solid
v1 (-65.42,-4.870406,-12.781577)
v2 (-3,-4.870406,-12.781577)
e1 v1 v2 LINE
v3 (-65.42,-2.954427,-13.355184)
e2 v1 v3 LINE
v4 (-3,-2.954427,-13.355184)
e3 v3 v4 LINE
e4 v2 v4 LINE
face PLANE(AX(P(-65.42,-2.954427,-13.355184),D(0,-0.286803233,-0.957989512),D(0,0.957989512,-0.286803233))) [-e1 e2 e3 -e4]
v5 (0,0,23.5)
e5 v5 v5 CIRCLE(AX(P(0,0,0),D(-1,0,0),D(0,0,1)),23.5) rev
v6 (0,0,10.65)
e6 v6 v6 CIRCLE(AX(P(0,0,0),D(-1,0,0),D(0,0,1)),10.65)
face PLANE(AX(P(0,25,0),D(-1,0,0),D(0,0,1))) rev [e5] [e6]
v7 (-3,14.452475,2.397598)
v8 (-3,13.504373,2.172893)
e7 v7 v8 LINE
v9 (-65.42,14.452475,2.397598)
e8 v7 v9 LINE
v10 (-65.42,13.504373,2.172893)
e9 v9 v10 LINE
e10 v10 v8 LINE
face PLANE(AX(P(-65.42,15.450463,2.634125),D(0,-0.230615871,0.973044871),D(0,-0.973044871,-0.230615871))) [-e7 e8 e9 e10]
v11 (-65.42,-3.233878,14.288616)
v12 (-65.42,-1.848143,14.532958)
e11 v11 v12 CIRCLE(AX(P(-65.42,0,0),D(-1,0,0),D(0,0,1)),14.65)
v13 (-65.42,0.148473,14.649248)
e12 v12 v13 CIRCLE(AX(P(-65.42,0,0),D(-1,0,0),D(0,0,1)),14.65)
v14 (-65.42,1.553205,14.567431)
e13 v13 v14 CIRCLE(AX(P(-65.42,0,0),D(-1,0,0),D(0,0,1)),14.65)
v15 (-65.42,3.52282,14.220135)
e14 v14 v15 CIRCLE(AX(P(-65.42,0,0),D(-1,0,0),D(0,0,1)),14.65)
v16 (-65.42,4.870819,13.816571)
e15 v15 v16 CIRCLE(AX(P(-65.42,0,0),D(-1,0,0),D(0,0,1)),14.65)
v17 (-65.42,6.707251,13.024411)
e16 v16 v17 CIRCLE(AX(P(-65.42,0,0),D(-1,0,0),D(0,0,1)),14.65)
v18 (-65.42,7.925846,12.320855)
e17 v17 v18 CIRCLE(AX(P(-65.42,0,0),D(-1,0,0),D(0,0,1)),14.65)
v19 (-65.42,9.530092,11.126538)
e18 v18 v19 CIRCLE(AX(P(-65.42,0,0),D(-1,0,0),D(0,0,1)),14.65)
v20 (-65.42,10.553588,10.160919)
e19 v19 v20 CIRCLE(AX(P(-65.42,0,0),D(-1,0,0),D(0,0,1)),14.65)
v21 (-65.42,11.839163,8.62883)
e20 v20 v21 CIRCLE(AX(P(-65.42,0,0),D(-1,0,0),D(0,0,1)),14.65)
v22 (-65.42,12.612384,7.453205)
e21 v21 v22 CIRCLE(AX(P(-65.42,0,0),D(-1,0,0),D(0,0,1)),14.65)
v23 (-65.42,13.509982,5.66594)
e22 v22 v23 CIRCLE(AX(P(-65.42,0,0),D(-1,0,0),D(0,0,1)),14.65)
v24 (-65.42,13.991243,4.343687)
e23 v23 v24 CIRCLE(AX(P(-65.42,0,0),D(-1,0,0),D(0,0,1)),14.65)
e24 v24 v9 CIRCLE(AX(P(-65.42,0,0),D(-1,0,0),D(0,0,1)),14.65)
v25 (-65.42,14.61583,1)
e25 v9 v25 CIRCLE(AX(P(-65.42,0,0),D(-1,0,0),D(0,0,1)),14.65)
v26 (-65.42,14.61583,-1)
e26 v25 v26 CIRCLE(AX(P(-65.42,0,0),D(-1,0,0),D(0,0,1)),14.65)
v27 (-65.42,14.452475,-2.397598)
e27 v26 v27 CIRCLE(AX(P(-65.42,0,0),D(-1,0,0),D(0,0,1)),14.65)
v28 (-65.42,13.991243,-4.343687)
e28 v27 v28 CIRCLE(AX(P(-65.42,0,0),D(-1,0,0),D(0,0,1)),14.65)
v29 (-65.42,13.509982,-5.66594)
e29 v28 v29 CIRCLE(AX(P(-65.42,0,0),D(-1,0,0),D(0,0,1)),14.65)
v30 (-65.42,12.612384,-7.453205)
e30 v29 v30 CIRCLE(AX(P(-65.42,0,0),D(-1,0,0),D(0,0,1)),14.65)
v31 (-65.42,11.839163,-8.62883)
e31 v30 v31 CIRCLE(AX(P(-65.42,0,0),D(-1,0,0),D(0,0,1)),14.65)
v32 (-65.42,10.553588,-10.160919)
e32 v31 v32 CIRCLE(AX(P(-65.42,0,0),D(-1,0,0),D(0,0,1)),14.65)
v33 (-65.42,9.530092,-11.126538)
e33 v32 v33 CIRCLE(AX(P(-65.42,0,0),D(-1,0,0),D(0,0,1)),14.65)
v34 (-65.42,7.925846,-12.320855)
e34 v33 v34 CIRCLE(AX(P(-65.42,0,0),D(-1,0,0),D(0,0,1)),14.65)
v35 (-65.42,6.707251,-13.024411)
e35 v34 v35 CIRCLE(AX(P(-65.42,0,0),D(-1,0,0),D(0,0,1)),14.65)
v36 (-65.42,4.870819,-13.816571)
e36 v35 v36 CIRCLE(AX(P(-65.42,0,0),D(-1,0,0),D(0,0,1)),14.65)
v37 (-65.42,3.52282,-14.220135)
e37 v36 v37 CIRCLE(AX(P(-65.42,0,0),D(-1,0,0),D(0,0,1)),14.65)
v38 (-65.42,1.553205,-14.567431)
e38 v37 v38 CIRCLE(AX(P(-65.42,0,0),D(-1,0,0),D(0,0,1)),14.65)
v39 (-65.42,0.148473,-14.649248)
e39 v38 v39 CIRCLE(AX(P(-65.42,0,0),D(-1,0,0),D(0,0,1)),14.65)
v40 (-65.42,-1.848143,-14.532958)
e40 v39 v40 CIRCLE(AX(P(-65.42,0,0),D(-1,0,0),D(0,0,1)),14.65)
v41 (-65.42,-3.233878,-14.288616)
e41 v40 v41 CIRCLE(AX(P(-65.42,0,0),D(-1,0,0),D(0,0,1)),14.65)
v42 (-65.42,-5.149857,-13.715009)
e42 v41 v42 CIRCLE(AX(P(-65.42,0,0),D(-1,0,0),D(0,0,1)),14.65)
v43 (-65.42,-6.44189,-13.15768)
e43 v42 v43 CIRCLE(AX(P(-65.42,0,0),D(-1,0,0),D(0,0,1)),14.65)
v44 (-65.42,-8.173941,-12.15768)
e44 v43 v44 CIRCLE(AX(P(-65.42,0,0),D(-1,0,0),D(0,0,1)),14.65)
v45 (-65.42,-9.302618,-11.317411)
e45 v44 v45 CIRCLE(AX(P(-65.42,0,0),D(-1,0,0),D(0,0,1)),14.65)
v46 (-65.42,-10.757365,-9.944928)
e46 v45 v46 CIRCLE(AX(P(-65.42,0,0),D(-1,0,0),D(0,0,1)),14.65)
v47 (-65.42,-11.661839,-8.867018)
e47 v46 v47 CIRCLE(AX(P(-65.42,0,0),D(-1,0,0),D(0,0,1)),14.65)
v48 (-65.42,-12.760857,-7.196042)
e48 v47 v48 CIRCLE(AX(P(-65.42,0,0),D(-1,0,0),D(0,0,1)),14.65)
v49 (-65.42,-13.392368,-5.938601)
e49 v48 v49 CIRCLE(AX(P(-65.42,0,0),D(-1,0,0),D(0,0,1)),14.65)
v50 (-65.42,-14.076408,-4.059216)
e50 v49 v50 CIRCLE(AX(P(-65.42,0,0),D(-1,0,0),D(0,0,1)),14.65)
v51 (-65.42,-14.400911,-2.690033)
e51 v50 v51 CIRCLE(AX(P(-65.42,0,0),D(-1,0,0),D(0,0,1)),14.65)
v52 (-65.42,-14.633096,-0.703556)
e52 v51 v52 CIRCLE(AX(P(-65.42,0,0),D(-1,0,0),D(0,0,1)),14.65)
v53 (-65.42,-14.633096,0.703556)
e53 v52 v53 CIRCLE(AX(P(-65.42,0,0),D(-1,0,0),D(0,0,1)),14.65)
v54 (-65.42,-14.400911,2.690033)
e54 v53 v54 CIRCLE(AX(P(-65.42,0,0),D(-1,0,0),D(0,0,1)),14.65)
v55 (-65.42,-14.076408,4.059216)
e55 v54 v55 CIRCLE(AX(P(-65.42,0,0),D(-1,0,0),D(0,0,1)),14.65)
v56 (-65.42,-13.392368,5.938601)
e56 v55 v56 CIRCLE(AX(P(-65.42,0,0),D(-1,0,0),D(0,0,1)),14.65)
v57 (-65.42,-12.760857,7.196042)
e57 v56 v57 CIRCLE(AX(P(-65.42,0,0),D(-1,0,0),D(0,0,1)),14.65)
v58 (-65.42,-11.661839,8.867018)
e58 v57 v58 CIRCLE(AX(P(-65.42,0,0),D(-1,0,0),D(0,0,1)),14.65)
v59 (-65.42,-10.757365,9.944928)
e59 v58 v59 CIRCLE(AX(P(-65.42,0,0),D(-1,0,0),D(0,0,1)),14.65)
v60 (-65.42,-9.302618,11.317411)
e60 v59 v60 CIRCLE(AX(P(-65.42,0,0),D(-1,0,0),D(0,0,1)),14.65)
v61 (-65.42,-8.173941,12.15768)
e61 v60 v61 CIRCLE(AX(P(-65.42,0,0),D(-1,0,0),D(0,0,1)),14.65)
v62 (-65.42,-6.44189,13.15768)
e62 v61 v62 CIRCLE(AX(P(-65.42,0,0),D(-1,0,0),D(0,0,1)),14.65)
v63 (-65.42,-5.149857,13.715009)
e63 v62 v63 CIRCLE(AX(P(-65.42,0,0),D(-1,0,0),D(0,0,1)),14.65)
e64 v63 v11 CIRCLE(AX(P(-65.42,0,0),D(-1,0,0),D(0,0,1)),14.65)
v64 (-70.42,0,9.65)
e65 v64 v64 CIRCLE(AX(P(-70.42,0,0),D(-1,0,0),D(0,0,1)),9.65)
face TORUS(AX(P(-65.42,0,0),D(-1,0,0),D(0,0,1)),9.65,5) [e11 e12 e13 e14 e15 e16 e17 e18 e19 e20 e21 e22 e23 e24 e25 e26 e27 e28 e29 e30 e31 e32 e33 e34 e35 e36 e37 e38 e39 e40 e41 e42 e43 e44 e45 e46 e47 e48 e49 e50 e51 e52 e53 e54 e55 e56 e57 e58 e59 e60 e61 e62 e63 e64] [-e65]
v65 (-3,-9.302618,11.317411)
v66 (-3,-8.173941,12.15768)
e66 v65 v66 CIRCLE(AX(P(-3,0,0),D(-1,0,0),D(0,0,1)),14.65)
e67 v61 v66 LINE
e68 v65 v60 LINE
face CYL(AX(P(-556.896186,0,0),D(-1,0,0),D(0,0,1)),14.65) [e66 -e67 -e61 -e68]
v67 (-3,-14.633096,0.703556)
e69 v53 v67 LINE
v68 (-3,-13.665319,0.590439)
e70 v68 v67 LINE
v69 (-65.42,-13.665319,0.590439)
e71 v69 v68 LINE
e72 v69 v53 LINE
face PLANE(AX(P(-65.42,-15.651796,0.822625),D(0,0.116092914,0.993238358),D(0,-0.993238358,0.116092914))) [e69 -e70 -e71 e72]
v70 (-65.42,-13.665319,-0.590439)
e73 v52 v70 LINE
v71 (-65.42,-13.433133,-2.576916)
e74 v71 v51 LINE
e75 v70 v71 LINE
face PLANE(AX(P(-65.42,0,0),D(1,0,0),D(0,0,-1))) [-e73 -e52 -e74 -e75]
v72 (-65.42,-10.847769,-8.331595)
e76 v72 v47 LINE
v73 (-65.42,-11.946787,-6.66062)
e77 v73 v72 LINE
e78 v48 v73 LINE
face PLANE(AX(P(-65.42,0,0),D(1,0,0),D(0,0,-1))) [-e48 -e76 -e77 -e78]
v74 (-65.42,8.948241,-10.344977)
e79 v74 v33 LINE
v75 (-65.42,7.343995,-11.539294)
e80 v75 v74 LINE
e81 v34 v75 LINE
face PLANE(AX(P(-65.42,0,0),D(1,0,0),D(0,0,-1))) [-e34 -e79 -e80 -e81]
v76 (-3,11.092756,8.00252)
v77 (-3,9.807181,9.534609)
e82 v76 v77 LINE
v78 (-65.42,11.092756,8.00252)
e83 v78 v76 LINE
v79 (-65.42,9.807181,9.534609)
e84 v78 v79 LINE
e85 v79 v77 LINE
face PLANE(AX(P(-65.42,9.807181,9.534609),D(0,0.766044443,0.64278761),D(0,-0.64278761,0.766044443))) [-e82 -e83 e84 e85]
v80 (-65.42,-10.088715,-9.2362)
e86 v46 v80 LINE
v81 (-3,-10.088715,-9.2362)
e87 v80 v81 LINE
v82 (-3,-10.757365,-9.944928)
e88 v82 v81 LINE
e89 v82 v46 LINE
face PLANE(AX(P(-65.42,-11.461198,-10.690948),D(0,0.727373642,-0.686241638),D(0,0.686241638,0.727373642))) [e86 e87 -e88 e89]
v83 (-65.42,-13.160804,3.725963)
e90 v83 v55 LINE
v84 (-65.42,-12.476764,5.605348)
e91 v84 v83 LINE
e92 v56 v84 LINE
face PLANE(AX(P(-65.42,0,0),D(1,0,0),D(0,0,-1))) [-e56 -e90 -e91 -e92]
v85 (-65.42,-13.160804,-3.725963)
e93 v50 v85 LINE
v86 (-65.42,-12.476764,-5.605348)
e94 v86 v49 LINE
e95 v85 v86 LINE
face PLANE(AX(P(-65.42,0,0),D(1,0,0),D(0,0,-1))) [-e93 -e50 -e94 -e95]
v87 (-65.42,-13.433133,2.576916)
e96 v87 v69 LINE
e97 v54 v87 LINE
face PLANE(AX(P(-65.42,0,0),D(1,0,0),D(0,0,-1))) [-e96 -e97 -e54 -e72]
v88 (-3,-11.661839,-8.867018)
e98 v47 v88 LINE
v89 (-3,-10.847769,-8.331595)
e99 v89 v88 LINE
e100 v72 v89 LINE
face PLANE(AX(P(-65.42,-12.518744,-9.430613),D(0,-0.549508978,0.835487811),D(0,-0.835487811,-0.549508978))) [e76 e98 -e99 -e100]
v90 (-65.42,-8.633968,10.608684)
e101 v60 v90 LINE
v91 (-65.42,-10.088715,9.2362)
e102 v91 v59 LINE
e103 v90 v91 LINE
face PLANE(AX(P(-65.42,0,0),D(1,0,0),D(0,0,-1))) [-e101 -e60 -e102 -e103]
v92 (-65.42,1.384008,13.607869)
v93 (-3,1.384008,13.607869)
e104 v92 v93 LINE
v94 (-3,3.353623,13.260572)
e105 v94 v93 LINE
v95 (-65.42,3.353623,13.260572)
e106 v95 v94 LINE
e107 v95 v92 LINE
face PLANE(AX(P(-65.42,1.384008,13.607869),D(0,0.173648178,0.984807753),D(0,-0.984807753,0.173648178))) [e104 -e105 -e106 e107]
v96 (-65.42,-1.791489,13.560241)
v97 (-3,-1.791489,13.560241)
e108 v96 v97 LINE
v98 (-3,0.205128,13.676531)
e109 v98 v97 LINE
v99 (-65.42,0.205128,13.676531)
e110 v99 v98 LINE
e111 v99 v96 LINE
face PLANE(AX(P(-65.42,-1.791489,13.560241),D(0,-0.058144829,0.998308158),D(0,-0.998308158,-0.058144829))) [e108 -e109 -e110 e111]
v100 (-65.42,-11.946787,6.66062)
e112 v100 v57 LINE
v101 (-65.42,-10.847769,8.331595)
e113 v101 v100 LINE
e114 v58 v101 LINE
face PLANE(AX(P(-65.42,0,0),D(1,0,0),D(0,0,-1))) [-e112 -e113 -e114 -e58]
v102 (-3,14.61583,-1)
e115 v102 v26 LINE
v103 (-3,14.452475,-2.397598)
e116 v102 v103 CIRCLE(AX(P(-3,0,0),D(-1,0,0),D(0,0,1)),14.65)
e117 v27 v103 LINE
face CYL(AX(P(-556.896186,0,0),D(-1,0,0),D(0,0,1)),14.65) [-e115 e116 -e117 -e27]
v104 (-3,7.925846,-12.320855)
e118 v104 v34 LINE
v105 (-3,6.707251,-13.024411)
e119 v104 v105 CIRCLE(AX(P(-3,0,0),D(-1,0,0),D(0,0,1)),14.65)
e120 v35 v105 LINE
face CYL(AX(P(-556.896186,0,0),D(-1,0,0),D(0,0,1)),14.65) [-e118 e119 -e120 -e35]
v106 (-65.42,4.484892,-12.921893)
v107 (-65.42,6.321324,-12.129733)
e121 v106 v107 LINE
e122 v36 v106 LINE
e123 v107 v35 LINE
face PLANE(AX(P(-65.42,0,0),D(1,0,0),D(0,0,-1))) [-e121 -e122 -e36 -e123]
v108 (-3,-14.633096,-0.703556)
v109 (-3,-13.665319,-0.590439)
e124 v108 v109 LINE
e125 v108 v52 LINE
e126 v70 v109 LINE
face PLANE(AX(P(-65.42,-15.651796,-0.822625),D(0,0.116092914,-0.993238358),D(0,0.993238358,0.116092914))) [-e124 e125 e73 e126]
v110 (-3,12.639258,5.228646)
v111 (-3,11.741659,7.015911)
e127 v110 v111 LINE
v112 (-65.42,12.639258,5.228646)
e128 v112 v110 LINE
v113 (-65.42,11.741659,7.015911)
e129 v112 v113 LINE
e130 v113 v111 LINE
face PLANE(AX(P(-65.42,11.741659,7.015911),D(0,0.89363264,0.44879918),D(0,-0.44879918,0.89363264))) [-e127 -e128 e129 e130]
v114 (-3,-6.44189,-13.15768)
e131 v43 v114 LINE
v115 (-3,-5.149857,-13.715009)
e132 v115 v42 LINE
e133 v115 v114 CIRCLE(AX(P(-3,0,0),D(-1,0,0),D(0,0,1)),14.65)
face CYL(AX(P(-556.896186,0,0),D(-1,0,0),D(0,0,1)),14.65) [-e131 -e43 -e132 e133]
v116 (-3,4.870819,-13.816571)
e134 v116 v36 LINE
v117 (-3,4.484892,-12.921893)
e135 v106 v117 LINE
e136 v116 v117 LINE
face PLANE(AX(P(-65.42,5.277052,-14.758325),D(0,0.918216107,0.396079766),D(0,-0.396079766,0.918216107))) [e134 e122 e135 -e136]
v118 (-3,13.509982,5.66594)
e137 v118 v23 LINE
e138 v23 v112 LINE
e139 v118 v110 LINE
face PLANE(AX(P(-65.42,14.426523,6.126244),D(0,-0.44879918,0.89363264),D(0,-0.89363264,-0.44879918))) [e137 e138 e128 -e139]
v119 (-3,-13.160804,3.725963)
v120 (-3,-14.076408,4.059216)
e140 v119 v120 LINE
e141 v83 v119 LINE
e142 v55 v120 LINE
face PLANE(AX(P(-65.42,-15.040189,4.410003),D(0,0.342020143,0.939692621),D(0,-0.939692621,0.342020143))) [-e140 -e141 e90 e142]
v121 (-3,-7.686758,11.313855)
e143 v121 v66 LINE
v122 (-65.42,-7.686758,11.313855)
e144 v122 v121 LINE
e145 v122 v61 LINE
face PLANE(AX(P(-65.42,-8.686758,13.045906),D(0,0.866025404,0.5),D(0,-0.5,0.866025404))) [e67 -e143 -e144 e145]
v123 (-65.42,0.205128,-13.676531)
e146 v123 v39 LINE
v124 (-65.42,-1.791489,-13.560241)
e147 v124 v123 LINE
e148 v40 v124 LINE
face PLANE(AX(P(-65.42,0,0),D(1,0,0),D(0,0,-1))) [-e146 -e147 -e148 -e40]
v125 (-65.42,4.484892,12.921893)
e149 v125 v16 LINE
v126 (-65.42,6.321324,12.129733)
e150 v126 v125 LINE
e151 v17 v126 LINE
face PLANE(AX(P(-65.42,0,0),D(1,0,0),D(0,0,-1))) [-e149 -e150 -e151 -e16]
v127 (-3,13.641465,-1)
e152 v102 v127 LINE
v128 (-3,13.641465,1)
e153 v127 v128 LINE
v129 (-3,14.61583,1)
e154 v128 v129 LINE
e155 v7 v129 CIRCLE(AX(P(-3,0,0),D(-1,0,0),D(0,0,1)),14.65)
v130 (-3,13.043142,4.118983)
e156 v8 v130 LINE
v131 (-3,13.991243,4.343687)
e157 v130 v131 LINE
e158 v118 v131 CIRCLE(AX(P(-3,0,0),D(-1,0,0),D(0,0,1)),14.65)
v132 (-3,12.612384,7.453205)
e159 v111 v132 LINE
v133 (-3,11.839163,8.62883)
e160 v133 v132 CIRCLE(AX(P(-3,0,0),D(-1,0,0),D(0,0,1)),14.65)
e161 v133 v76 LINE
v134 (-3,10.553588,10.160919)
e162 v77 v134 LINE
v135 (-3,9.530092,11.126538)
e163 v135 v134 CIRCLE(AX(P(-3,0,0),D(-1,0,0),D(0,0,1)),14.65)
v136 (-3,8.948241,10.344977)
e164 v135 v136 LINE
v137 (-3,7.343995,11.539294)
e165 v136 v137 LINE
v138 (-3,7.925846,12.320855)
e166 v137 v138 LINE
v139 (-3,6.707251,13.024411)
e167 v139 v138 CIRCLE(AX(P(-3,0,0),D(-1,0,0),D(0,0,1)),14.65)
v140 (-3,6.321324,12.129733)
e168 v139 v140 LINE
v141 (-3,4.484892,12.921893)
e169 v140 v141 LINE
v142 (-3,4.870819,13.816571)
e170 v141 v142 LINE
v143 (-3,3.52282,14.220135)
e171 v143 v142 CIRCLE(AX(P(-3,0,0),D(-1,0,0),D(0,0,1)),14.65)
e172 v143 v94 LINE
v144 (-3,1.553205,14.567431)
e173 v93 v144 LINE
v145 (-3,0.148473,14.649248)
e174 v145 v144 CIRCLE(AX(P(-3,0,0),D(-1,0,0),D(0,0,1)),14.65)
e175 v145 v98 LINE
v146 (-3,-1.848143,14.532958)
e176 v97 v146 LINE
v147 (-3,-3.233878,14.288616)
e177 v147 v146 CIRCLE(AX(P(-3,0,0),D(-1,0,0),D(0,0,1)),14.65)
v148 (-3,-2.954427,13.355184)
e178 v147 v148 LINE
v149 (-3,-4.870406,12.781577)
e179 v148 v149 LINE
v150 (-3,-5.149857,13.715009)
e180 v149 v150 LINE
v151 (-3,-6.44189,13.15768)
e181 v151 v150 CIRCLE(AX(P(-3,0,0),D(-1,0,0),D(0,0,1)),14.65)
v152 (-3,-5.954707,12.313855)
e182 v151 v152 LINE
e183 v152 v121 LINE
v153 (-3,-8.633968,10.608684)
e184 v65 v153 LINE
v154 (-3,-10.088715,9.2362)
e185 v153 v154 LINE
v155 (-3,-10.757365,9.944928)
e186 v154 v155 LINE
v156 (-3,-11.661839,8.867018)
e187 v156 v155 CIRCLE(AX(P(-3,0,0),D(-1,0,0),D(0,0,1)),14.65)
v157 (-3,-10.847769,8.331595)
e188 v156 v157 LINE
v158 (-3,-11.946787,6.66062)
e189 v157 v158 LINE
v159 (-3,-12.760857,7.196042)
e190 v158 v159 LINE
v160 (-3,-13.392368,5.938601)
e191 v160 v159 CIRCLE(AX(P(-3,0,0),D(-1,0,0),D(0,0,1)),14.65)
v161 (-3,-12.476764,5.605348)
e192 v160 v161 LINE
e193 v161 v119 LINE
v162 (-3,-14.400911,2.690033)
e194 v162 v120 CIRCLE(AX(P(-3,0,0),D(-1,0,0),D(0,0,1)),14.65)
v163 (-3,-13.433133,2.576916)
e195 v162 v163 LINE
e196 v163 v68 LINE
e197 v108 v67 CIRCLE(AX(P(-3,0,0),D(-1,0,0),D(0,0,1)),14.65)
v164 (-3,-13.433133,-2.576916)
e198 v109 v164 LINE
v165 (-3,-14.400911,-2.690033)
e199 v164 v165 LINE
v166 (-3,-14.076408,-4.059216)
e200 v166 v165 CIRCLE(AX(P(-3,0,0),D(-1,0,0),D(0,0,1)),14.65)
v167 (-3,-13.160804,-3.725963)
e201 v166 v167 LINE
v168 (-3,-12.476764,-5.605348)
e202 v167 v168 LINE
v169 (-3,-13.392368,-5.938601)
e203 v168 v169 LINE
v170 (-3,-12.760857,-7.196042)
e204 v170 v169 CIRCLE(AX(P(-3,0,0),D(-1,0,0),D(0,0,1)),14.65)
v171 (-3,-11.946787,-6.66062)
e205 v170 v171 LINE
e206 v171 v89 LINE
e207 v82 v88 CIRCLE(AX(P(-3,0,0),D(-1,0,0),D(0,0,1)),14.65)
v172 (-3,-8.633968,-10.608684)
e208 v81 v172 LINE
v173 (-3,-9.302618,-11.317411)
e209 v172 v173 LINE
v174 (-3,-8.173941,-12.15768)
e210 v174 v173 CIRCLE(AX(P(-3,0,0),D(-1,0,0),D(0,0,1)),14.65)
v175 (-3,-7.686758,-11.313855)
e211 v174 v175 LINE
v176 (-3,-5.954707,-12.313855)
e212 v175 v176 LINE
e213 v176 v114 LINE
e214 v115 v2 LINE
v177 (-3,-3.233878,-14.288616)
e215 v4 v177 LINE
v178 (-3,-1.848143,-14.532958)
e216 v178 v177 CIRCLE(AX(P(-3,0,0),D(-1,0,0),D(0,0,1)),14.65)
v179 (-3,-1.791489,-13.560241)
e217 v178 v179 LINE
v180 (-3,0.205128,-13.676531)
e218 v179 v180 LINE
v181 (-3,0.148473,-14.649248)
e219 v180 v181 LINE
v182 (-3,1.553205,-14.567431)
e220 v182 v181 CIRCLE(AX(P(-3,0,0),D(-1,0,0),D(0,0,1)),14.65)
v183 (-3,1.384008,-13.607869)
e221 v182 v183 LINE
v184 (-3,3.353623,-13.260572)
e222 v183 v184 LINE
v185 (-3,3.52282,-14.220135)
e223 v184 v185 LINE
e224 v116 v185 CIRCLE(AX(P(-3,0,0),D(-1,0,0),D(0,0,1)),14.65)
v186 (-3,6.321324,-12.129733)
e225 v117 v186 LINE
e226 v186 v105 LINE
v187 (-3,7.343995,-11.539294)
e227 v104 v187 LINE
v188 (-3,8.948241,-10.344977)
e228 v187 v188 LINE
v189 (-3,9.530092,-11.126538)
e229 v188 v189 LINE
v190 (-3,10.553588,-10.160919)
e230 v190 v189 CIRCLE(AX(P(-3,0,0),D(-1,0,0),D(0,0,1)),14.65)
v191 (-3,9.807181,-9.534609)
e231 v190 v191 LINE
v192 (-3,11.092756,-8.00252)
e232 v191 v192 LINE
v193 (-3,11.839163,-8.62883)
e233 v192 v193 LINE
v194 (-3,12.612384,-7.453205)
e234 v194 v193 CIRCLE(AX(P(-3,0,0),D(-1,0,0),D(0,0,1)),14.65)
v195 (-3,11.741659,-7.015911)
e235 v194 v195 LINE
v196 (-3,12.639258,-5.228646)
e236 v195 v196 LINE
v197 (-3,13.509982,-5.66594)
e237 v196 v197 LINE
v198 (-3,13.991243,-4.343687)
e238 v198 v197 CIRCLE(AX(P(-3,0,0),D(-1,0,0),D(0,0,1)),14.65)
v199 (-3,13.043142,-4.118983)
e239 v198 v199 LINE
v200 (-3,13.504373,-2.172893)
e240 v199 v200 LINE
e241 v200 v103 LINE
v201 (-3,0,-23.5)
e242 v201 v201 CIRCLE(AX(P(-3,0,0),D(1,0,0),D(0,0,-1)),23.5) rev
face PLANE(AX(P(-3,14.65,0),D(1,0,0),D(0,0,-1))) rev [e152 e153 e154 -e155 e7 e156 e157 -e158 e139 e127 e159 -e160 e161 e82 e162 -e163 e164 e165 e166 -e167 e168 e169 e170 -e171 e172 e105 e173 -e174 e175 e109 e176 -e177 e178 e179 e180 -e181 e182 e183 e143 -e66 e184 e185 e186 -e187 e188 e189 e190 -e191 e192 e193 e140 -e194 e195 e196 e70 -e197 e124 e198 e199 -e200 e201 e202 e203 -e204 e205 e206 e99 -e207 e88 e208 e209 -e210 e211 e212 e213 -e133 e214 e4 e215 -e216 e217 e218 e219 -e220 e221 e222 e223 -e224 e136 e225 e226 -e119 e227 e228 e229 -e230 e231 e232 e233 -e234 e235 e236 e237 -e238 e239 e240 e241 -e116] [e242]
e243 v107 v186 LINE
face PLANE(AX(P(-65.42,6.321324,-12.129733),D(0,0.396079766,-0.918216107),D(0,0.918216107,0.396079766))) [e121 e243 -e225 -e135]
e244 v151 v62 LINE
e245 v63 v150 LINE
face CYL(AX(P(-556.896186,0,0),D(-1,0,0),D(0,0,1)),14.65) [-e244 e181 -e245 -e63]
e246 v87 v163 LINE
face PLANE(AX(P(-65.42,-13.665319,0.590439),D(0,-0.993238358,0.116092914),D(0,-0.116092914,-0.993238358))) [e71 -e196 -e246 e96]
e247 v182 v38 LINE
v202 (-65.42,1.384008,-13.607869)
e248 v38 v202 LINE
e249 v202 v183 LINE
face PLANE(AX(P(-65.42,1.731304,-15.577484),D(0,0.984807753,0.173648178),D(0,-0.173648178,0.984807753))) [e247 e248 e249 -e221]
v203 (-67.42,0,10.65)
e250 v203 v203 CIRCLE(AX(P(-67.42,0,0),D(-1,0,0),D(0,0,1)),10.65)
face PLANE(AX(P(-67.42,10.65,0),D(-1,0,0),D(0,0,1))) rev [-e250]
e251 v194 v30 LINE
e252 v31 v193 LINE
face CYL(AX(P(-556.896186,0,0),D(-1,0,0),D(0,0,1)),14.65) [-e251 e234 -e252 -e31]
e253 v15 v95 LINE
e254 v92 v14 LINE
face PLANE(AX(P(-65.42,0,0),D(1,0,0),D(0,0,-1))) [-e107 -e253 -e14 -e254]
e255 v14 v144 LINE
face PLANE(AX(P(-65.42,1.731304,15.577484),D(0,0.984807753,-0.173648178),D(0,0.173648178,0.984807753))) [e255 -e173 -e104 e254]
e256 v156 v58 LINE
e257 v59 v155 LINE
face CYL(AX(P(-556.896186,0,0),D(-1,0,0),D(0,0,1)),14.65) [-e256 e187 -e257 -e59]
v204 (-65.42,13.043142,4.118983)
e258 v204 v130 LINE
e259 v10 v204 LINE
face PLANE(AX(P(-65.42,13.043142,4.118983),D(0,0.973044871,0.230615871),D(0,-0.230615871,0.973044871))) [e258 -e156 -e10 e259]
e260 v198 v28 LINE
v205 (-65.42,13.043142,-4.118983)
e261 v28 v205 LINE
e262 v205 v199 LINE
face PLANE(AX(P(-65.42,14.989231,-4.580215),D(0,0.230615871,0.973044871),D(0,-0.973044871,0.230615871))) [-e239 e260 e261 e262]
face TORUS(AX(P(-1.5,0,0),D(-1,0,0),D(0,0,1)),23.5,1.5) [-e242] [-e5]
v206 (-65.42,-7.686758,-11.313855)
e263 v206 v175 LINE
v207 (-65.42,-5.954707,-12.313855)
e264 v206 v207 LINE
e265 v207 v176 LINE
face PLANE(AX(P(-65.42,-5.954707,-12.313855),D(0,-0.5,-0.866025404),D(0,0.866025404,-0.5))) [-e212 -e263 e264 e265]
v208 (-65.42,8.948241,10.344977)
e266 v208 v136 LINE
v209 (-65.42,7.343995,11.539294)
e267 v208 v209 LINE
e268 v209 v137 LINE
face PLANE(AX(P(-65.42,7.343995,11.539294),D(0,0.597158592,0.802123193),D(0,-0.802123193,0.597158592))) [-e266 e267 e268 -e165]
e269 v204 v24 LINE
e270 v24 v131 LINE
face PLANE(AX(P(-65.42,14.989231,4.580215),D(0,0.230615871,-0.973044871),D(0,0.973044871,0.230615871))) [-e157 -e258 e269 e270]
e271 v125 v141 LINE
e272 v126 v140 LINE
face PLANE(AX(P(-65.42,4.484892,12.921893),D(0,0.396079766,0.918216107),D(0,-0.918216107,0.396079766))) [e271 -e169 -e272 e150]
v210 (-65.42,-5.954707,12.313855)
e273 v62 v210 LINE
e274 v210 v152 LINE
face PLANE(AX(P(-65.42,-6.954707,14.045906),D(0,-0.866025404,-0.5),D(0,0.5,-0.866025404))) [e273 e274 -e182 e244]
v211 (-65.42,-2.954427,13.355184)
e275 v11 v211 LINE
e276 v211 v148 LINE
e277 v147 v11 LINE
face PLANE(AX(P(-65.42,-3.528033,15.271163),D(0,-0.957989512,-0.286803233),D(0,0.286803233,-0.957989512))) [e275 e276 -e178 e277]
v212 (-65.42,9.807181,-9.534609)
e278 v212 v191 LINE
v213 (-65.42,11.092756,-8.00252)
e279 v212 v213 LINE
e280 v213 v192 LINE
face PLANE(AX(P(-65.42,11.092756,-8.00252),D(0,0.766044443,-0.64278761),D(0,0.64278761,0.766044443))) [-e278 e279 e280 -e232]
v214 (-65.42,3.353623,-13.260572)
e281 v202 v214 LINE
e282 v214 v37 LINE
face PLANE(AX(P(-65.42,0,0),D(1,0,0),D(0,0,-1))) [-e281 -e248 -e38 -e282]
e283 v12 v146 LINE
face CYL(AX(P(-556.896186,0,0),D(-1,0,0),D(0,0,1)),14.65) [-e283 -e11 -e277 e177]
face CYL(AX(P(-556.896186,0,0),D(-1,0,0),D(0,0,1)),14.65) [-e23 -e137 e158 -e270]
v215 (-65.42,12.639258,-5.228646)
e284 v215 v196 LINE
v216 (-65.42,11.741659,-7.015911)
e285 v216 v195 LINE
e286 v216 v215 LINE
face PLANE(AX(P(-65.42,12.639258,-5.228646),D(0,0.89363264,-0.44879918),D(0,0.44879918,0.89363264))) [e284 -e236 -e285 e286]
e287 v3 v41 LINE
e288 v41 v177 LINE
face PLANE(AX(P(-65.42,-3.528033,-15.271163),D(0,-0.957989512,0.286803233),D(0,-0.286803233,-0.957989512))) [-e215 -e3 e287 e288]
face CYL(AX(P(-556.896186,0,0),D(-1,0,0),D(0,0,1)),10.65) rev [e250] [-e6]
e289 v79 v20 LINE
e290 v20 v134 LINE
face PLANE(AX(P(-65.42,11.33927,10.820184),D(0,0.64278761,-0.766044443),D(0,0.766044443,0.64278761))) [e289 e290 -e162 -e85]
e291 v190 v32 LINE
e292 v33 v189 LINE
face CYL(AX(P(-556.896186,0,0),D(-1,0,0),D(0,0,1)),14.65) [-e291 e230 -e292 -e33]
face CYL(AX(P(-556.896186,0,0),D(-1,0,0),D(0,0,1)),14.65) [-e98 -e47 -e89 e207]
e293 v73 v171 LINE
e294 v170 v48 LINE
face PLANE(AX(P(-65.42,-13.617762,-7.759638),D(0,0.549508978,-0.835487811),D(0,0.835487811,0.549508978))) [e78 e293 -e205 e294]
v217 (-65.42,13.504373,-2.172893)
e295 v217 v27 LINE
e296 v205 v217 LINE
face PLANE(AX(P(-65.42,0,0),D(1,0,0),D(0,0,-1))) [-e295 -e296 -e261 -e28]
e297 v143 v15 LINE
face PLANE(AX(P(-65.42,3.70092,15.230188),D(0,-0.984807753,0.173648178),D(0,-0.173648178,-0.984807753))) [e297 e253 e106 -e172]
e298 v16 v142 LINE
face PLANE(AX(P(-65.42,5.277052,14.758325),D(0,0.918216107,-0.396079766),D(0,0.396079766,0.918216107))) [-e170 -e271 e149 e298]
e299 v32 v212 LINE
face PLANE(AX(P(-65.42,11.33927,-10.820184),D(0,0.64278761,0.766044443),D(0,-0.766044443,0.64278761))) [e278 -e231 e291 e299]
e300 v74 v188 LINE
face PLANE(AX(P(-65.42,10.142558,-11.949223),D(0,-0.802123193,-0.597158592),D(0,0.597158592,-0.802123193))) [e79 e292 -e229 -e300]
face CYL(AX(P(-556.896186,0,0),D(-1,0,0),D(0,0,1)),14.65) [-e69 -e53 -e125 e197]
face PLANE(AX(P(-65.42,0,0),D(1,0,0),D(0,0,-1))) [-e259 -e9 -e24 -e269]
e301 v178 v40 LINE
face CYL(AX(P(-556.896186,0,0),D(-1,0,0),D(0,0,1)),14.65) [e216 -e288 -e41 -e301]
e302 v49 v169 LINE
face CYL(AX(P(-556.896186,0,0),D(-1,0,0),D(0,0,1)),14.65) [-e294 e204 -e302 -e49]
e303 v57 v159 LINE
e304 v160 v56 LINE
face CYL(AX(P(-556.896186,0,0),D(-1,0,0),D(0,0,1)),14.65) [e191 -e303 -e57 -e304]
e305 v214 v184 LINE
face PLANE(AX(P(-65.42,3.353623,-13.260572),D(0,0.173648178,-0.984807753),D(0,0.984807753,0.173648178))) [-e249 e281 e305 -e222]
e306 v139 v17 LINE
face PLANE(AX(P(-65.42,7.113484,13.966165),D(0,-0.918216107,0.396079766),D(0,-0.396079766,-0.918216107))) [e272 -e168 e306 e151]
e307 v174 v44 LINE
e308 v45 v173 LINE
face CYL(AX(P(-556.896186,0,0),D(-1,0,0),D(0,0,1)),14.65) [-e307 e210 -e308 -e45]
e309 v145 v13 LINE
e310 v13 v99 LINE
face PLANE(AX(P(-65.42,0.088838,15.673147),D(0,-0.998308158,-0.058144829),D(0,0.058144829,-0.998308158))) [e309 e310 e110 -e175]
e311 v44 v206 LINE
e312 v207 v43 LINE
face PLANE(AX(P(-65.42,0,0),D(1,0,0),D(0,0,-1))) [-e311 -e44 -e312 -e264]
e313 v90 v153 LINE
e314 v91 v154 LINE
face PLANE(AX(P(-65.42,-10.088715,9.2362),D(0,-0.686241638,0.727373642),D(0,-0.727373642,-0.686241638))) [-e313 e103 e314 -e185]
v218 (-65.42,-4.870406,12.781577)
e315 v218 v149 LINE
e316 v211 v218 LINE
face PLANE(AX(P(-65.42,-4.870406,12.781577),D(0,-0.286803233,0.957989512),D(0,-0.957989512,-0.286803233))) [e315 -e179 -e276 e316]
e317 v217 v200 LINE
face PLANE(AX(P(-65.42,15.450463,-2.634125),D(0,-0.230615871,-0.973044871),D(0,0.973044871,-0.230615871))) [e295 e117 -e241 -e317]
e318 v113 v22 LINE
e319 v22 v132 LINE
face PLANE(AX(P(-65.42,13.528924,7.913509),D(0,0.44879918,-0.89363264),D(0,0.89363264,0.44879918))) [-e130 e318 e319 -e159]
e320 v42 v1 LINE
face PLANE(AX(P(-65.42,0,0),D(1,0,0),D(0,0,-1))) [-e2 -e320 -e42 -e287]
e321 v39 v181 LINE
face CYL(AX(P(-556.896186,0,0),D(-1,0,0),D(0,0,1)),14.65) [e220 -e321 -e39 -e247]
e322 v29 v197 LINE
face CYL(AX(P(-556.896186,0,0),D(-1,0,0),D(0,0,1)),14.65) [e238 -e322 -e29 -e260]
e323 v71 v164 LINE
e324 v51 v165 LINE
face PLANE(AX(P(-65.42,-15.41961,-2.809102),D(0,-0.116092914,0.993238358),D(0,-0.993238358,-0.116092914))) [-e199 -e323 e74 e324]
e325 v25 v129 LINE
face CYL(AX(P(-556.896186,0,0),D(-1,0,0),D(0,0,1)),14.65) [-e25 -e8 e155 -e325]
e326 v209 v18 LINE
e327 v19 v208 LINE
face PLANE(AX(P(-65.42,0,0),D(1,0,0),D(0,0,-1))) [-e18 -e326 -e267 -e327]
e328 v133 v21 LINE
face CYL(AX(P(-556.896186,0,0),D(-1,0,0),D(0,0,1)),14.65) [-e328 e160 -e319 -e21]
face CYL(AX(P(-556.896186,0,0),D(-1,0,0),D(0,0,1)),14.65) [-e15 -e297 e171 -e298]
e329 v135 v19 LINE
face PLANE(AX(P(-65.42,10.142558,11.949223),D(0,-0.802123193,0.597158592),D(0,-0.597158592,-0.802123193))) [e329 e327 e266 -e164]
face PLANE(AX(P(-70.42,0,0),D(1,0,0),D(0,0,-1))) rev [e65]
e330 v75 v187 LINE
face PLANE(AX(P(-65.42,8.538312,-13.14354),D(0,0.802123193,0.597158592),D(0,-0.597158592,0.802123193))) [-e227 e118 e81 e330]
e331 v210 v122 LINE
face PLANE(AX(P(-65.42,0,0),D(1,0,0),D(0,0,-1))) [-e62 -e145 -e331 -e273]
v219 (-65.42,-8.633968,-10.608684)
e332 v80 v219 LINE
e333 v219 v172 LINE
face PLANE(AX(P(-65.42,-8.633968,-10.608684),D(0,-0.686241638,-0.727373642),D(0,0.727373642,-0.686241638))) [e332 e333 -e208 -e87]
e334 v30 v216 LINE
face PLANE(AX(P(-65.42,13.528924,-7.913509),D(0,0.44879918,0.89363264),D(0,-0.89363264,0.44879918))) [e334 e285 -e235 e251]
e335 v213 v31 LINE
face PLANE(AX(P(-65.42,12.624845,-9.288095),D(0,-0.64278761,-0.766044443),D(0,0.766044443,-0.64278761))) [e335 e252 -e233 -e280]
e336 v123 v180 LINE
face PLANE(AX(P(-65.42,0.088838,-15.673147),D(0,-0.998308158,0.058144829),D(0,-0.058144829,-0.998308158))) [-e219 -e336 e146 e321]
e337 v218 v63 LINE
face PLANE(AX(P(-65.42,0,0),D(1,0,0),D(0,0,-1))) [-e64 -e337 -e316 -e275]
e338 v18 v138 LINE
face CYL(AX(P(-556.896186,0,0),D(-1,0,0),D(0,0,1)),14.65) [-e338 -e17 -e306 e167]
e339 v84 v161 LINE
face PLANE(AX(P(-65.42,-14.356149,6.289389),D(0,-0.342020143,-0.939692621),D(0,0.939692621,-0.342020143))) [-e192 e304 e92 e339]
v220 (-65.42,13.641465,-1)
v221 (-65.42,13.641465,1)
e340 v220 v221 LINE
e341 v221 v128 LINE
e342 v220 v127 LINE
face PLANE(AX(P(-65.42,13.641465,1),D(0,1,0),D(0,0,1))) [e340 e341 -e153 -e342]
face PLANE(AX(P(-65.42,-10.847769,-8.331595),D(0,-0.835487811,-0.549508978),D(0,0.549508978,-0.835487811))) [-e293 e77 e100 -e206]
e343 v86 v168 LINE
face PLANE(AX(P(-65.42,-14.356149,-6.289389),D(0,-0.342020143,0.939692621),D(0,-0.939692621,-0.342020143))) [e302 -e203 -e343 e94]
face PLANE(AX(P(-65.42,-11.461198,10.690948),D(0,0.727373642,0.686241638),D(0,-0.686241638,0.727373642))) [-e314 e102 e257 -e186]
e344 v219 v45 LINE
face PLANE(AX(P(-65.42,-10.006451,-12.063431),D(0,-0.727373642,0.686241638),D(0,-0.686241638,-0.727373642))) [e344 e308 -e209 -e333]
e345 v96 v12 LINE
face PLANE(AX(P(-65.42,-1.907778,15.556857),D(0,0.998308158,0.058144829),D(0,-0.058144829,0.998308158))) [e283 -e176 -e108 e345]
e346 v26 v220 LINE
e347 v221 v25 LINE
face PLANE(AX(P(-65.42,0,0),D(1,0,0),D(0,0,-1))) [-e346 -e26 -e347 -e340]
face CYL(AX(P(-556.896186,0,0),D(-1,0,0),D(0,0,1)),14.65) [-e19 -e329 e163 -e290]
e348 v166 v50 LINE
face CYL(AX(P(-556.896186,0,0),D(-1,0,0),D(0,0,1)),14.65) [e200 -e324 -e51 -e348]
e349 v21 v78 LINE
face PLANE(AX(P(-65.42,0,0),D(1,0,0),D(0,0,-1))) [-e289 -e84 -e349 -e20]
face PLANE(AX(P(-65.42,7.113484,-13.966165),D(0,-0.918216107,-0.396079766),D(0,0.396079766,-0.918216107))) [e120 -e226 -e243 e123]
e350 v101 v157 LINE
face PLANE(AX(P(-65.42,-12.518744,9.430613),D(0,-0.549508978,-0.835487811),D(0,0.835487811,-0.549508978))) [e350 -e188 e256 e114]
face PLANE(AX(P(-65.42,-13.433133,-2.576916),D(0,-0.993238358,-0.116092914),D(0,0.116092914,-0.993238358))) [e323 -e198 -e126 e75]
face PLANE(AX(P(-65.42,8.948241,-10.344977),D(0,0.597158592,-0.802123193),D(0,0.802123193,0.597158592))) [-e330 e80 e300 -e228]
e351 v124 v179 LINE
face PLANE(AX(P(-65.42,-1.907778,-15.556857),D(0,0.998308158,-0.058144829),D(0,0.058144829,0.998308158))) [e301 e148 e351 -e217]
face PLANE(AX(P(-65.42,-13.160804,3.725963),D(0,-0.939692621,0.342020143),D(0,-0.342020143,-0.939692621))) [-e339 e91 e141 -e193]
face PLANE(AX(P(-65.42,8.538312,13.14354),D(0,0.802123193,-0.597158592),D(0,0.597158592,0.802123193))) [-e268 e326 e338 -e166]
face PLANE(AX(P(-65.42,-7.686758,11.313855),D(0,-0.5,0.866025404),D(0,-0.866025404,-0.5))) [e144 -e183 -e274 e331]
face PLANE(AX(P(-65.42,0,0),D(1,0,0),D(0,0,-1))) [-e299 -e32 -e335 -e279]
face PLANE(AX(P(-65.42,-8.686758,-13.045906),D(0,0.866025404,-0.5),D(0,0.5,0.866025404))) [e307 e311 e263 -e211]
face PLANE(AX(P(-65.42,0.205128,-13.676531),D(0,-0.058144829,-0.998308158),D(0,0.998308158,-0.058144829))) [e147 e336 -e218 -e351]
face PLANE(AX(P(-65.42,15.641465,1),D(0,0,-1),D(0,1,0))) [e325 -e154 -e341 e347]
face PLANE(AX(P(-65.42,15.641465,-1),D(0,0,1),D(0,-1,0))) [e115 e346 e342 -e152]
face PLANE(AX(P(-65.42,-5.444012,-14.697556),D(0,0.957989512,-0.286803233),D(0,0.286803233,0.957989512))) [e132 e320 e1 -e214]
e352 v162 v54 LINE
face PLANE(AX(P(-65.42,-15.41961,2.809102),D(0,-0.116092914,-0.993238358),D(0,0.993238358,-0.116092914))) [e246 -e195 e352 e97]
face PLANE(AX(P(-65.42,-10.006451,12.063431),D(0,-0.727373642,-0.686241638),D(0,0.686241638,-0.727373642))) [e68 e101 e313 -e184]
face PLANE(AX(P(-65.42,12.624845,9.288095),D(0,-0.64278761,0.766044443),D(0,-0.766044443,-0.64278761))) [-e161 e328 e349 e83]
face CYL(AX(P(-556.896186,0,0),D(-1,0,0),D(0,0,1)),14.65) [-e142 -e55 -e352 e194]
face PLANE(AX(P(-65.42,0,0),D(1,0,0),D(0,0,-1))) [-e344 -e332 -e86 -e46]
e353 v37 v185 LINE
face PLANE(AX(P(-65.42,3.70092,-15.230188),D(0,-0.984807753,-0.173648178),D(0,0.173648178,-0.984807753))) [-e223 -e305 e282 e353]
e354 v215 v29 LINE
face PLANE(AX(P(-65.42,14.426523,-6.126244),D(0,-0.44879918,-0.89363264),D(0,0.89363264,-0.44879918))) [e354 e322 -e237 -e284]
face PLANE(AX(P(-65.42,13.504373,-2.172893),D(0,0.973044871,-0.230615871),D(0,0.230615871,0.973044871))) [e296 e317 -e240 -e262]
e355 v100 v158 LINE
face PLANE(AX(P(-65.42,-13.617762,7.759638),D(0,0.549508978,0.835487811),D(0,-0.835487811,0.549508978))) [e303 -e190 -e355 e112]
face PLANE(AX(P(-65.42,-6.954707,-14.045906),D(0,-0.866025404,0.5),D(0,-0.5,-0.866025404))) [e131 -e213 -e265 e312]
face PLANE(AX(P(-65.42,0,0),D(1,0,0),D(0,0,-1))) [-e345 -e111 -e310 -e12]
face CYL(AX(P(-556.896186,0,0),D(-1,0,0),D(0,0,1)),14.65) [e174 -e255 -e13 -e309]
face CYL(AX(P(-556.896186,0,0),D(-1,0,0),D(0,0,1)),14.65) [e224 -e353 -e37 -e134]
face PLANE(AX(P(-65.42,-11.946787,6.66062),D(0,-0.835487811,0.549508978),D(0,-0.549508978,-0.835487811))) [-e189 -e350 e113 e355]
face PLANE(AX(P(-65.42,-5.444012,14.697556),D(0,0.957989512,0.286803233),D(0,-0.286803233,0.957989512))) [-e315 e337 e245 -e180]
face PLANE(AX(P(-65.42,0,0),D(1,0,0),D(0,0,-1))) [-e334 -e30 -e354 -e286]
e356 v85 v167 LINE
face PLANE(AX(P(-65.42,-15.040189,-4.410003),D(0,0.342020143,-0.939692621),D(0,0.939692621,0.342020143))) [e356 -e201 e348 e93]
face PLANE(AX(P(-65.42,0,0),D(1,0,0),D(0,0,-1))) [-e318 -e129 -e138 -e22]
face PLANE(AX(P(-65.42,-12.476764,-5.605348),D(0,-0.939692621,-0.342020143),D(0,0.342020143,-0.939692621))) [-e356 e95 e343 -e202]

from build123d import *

# Parameters (mm, degrees)
FILLET1_R          = 1.5
SKETCH3_W          = 2
SKETCH3_H          = 2
CUT_EXTRUDE1_DEPTH = 62.42


with BuildPart() as part:
    # Sketch2 → Revolve1 (revolve)
    with BuildSketch(Plane.XY, mode=Mode.PRIVATE) as revolve1_sk:
        with BuildLine():
            Line((0, 25), (0, 10.65))
            Line((0, 10.65), (-67.42, 10.65))
            Line((-67.42, 10.65), (-67.42, 0))
            Line((-67.42, 0), (-70.42, 0))
            Line((-70.42, 0), (-70.42, 9.65))
            ThreePointArc((-70.42, 9.65), (-68.955533906, 13.185533906), (-65.42, 14.65))
            Line((-65.42, 14.65), (-3, 14.65))
            Line((-3, 14.65), (-3, 25))
            Line((-3, 25), (0, 25))
        make_face()
    revolve(revolve1_sk.sketch.rotate(Axis((-556.896186161, 0, 0), (1, 0, 0)), 90), axis=Axis((-556.896186161, 0, 0), (1, 0, 0)))

    # Fillet1
    fillet1_edges = [part.edges().sort_by_distance(p)[0] for p in [
        (0, 0, -25),
        (-3, 0, -25),
    ]]
    fillet(fillet1_edges, radius=FILLET1_R - 0.0001)  # a hair under: the kernel refuses the full size

    # Sketch3 → Cut-Extrude1 (cut)
    with BuildSketch(Plane.ZY.offset(3)):
        Polygon((2.6341252, 15.450463157), (2.172893459, 13.504373416), (4.1189832, 13.043141675), (4.580214941, 14.989231416), align=None)
        with Locations((0, 14.641465)):
            Rectangle(SKETCH3_W, SKETCH3_H)
        Polygon((6.126244029, 14.426522847), (5.228645668, 12.639257566), (7.015910949, 11.741659206), (7.913509309, 13.528924486), align=None)
        Polygon((9.288095456, 12.624844955), (8.002520237, 11.092756069), (9.534609123, 9.80718085), (10.820184342, 11.339269736), align=None)
        Polygon((11.949223253, 10.142558404), (10.344976868, 8.948241221), (11.539294051, 7.343994835), (13.143540437, 8.538312019), align=None)
        Polygon((13.966165332, 7.113483905), (12.129733118, 6.321324373), (12.92189265, 4.484892159), (14.758324864, 5.277051691), align=None)
        Polygon((15.230187823, 3.700919646), (13.260572317, 3.353623291), (13.607868672, 1.384007785), (15.577484178, 1.73130414), align=None)
        Polygon((15.673146946, 0.088837852), (13.676530629, 0.20512751), (13.560240971, -1.791488807), (15.556857288, -1.907778465), align=None)
        Polygon((15.27116266, -3.528033214), (13.355183635, -2.954426749), (12.78157717, -4.870405773), (14.697556195, -5.444012239), align=None)
        Polygon((14.045906042, -6.954707096), (12.313855235, -5.954707096), (11.313855235, -7.686757904), (13.045906042, -8.686757904), align=None)
        Polygon((12.063430994, -10.006450919), (10.608683711, -8.633967643), (9.236200436, -10.088714926), (10.690947719, -11.461198202), align=None)
        Polygon((9.430613259, -12.518744382), (8.331595303, -10.847768759), (6.66061968, -11.946786715), (7.759637636, -13.617762338), align=None)
        Polygon((6.289388722, -14.356149095), (5.605348435, -12.476763854), (3.725963194, -13.160804141), (4.41000348, -15.040189382), align=None)
        Polygon((2.809101611, -15.419610095), (2.576915783, -13.43313338), (0.590439067, -13.665319208), (0.822624895, -15.651795923), align=None)
        Polygon((-0.822624895, -15.651795923), (-0.590439067, -13.665319208), (-2.576915783, -13.43313338), (-2.809101611, -15.419610095), align=None)
        Polygon((-4.41000348, -15.040189382), (-3.725963194, -13.160804141), (-5.605348435, -12.476763854), (-6.289388722, -14.356149095), align=None)
        Polygon((-7.759637636, -13.617762338), (-6.66061968, -11.946786715), (-8.331595303, -10.847768759), (-9.430613259, -12.518744382), align=None)
        Polygon((-10.690947719, -11.461198202), (-9.236200436, -10.088714926), (-10.608683711, -8.633967643), (-12.063430994, -10.006450919), align=None)
        Polygon((-13.045906042, -8.686757904), (-11.313855235, -7.686757904), (-12.313855235, -5.954707096), (-14.045906042, -6.954707096), align=None)
        Polygon((-14.697556195, -5.444012239), (-12.78157717, -4.870405773), (-13.355183635, -2.954426749), (-15.27116266, -3.528033214), align=None)
        Polygon((-15.556857288, -1.907778465), (-13.560240971, -1.791488807), (-13.676530629, 0.20512751), (-15.673146946, 0.088837852), align=None)
        Polygon((-15.577484178, 1.73130414), (-13.607868672, 1.384007785), (-13.260572317, 3.353623291), (-15.230187823, 3.700919646), align=None)
        Polygon((-14.758324864, 5.277051691), (-12.92189265, 4.484892159), (-12.129733118, 6.321324373), (-13.966165332, 7.113483905), align=None)
        Polygon((-13.143540437, 8.538312019), (-11.539294051, 7.343994835), (-10.344976868, 8.948241221), (-11.949223253, 10.142558404), align=None)
        Polygon((-10.820184342, 11.339269736), (-9.534609123, 9.80718085), (-8.002520237, 11.092756069), (-9.288095456, 12.624844955), align=None)
        Polygon((-7.913509309, 13.528924486), (-7.015910949, 11.741659206), (-5.228645668, 12.639257566), (-6.126244029, 14.426522847), align=None)
        Polygon((-4.580214941, 14.989231416), (-4.1189832, 13.043141675), (-2.172893459, 13.504373416), (-2.6341252, 15.450463157), align=None)
    extrude(amount=CUT_EXTRUDE1_DEPTH, mode=Mode.SUBTRACT)


solid = part.part
